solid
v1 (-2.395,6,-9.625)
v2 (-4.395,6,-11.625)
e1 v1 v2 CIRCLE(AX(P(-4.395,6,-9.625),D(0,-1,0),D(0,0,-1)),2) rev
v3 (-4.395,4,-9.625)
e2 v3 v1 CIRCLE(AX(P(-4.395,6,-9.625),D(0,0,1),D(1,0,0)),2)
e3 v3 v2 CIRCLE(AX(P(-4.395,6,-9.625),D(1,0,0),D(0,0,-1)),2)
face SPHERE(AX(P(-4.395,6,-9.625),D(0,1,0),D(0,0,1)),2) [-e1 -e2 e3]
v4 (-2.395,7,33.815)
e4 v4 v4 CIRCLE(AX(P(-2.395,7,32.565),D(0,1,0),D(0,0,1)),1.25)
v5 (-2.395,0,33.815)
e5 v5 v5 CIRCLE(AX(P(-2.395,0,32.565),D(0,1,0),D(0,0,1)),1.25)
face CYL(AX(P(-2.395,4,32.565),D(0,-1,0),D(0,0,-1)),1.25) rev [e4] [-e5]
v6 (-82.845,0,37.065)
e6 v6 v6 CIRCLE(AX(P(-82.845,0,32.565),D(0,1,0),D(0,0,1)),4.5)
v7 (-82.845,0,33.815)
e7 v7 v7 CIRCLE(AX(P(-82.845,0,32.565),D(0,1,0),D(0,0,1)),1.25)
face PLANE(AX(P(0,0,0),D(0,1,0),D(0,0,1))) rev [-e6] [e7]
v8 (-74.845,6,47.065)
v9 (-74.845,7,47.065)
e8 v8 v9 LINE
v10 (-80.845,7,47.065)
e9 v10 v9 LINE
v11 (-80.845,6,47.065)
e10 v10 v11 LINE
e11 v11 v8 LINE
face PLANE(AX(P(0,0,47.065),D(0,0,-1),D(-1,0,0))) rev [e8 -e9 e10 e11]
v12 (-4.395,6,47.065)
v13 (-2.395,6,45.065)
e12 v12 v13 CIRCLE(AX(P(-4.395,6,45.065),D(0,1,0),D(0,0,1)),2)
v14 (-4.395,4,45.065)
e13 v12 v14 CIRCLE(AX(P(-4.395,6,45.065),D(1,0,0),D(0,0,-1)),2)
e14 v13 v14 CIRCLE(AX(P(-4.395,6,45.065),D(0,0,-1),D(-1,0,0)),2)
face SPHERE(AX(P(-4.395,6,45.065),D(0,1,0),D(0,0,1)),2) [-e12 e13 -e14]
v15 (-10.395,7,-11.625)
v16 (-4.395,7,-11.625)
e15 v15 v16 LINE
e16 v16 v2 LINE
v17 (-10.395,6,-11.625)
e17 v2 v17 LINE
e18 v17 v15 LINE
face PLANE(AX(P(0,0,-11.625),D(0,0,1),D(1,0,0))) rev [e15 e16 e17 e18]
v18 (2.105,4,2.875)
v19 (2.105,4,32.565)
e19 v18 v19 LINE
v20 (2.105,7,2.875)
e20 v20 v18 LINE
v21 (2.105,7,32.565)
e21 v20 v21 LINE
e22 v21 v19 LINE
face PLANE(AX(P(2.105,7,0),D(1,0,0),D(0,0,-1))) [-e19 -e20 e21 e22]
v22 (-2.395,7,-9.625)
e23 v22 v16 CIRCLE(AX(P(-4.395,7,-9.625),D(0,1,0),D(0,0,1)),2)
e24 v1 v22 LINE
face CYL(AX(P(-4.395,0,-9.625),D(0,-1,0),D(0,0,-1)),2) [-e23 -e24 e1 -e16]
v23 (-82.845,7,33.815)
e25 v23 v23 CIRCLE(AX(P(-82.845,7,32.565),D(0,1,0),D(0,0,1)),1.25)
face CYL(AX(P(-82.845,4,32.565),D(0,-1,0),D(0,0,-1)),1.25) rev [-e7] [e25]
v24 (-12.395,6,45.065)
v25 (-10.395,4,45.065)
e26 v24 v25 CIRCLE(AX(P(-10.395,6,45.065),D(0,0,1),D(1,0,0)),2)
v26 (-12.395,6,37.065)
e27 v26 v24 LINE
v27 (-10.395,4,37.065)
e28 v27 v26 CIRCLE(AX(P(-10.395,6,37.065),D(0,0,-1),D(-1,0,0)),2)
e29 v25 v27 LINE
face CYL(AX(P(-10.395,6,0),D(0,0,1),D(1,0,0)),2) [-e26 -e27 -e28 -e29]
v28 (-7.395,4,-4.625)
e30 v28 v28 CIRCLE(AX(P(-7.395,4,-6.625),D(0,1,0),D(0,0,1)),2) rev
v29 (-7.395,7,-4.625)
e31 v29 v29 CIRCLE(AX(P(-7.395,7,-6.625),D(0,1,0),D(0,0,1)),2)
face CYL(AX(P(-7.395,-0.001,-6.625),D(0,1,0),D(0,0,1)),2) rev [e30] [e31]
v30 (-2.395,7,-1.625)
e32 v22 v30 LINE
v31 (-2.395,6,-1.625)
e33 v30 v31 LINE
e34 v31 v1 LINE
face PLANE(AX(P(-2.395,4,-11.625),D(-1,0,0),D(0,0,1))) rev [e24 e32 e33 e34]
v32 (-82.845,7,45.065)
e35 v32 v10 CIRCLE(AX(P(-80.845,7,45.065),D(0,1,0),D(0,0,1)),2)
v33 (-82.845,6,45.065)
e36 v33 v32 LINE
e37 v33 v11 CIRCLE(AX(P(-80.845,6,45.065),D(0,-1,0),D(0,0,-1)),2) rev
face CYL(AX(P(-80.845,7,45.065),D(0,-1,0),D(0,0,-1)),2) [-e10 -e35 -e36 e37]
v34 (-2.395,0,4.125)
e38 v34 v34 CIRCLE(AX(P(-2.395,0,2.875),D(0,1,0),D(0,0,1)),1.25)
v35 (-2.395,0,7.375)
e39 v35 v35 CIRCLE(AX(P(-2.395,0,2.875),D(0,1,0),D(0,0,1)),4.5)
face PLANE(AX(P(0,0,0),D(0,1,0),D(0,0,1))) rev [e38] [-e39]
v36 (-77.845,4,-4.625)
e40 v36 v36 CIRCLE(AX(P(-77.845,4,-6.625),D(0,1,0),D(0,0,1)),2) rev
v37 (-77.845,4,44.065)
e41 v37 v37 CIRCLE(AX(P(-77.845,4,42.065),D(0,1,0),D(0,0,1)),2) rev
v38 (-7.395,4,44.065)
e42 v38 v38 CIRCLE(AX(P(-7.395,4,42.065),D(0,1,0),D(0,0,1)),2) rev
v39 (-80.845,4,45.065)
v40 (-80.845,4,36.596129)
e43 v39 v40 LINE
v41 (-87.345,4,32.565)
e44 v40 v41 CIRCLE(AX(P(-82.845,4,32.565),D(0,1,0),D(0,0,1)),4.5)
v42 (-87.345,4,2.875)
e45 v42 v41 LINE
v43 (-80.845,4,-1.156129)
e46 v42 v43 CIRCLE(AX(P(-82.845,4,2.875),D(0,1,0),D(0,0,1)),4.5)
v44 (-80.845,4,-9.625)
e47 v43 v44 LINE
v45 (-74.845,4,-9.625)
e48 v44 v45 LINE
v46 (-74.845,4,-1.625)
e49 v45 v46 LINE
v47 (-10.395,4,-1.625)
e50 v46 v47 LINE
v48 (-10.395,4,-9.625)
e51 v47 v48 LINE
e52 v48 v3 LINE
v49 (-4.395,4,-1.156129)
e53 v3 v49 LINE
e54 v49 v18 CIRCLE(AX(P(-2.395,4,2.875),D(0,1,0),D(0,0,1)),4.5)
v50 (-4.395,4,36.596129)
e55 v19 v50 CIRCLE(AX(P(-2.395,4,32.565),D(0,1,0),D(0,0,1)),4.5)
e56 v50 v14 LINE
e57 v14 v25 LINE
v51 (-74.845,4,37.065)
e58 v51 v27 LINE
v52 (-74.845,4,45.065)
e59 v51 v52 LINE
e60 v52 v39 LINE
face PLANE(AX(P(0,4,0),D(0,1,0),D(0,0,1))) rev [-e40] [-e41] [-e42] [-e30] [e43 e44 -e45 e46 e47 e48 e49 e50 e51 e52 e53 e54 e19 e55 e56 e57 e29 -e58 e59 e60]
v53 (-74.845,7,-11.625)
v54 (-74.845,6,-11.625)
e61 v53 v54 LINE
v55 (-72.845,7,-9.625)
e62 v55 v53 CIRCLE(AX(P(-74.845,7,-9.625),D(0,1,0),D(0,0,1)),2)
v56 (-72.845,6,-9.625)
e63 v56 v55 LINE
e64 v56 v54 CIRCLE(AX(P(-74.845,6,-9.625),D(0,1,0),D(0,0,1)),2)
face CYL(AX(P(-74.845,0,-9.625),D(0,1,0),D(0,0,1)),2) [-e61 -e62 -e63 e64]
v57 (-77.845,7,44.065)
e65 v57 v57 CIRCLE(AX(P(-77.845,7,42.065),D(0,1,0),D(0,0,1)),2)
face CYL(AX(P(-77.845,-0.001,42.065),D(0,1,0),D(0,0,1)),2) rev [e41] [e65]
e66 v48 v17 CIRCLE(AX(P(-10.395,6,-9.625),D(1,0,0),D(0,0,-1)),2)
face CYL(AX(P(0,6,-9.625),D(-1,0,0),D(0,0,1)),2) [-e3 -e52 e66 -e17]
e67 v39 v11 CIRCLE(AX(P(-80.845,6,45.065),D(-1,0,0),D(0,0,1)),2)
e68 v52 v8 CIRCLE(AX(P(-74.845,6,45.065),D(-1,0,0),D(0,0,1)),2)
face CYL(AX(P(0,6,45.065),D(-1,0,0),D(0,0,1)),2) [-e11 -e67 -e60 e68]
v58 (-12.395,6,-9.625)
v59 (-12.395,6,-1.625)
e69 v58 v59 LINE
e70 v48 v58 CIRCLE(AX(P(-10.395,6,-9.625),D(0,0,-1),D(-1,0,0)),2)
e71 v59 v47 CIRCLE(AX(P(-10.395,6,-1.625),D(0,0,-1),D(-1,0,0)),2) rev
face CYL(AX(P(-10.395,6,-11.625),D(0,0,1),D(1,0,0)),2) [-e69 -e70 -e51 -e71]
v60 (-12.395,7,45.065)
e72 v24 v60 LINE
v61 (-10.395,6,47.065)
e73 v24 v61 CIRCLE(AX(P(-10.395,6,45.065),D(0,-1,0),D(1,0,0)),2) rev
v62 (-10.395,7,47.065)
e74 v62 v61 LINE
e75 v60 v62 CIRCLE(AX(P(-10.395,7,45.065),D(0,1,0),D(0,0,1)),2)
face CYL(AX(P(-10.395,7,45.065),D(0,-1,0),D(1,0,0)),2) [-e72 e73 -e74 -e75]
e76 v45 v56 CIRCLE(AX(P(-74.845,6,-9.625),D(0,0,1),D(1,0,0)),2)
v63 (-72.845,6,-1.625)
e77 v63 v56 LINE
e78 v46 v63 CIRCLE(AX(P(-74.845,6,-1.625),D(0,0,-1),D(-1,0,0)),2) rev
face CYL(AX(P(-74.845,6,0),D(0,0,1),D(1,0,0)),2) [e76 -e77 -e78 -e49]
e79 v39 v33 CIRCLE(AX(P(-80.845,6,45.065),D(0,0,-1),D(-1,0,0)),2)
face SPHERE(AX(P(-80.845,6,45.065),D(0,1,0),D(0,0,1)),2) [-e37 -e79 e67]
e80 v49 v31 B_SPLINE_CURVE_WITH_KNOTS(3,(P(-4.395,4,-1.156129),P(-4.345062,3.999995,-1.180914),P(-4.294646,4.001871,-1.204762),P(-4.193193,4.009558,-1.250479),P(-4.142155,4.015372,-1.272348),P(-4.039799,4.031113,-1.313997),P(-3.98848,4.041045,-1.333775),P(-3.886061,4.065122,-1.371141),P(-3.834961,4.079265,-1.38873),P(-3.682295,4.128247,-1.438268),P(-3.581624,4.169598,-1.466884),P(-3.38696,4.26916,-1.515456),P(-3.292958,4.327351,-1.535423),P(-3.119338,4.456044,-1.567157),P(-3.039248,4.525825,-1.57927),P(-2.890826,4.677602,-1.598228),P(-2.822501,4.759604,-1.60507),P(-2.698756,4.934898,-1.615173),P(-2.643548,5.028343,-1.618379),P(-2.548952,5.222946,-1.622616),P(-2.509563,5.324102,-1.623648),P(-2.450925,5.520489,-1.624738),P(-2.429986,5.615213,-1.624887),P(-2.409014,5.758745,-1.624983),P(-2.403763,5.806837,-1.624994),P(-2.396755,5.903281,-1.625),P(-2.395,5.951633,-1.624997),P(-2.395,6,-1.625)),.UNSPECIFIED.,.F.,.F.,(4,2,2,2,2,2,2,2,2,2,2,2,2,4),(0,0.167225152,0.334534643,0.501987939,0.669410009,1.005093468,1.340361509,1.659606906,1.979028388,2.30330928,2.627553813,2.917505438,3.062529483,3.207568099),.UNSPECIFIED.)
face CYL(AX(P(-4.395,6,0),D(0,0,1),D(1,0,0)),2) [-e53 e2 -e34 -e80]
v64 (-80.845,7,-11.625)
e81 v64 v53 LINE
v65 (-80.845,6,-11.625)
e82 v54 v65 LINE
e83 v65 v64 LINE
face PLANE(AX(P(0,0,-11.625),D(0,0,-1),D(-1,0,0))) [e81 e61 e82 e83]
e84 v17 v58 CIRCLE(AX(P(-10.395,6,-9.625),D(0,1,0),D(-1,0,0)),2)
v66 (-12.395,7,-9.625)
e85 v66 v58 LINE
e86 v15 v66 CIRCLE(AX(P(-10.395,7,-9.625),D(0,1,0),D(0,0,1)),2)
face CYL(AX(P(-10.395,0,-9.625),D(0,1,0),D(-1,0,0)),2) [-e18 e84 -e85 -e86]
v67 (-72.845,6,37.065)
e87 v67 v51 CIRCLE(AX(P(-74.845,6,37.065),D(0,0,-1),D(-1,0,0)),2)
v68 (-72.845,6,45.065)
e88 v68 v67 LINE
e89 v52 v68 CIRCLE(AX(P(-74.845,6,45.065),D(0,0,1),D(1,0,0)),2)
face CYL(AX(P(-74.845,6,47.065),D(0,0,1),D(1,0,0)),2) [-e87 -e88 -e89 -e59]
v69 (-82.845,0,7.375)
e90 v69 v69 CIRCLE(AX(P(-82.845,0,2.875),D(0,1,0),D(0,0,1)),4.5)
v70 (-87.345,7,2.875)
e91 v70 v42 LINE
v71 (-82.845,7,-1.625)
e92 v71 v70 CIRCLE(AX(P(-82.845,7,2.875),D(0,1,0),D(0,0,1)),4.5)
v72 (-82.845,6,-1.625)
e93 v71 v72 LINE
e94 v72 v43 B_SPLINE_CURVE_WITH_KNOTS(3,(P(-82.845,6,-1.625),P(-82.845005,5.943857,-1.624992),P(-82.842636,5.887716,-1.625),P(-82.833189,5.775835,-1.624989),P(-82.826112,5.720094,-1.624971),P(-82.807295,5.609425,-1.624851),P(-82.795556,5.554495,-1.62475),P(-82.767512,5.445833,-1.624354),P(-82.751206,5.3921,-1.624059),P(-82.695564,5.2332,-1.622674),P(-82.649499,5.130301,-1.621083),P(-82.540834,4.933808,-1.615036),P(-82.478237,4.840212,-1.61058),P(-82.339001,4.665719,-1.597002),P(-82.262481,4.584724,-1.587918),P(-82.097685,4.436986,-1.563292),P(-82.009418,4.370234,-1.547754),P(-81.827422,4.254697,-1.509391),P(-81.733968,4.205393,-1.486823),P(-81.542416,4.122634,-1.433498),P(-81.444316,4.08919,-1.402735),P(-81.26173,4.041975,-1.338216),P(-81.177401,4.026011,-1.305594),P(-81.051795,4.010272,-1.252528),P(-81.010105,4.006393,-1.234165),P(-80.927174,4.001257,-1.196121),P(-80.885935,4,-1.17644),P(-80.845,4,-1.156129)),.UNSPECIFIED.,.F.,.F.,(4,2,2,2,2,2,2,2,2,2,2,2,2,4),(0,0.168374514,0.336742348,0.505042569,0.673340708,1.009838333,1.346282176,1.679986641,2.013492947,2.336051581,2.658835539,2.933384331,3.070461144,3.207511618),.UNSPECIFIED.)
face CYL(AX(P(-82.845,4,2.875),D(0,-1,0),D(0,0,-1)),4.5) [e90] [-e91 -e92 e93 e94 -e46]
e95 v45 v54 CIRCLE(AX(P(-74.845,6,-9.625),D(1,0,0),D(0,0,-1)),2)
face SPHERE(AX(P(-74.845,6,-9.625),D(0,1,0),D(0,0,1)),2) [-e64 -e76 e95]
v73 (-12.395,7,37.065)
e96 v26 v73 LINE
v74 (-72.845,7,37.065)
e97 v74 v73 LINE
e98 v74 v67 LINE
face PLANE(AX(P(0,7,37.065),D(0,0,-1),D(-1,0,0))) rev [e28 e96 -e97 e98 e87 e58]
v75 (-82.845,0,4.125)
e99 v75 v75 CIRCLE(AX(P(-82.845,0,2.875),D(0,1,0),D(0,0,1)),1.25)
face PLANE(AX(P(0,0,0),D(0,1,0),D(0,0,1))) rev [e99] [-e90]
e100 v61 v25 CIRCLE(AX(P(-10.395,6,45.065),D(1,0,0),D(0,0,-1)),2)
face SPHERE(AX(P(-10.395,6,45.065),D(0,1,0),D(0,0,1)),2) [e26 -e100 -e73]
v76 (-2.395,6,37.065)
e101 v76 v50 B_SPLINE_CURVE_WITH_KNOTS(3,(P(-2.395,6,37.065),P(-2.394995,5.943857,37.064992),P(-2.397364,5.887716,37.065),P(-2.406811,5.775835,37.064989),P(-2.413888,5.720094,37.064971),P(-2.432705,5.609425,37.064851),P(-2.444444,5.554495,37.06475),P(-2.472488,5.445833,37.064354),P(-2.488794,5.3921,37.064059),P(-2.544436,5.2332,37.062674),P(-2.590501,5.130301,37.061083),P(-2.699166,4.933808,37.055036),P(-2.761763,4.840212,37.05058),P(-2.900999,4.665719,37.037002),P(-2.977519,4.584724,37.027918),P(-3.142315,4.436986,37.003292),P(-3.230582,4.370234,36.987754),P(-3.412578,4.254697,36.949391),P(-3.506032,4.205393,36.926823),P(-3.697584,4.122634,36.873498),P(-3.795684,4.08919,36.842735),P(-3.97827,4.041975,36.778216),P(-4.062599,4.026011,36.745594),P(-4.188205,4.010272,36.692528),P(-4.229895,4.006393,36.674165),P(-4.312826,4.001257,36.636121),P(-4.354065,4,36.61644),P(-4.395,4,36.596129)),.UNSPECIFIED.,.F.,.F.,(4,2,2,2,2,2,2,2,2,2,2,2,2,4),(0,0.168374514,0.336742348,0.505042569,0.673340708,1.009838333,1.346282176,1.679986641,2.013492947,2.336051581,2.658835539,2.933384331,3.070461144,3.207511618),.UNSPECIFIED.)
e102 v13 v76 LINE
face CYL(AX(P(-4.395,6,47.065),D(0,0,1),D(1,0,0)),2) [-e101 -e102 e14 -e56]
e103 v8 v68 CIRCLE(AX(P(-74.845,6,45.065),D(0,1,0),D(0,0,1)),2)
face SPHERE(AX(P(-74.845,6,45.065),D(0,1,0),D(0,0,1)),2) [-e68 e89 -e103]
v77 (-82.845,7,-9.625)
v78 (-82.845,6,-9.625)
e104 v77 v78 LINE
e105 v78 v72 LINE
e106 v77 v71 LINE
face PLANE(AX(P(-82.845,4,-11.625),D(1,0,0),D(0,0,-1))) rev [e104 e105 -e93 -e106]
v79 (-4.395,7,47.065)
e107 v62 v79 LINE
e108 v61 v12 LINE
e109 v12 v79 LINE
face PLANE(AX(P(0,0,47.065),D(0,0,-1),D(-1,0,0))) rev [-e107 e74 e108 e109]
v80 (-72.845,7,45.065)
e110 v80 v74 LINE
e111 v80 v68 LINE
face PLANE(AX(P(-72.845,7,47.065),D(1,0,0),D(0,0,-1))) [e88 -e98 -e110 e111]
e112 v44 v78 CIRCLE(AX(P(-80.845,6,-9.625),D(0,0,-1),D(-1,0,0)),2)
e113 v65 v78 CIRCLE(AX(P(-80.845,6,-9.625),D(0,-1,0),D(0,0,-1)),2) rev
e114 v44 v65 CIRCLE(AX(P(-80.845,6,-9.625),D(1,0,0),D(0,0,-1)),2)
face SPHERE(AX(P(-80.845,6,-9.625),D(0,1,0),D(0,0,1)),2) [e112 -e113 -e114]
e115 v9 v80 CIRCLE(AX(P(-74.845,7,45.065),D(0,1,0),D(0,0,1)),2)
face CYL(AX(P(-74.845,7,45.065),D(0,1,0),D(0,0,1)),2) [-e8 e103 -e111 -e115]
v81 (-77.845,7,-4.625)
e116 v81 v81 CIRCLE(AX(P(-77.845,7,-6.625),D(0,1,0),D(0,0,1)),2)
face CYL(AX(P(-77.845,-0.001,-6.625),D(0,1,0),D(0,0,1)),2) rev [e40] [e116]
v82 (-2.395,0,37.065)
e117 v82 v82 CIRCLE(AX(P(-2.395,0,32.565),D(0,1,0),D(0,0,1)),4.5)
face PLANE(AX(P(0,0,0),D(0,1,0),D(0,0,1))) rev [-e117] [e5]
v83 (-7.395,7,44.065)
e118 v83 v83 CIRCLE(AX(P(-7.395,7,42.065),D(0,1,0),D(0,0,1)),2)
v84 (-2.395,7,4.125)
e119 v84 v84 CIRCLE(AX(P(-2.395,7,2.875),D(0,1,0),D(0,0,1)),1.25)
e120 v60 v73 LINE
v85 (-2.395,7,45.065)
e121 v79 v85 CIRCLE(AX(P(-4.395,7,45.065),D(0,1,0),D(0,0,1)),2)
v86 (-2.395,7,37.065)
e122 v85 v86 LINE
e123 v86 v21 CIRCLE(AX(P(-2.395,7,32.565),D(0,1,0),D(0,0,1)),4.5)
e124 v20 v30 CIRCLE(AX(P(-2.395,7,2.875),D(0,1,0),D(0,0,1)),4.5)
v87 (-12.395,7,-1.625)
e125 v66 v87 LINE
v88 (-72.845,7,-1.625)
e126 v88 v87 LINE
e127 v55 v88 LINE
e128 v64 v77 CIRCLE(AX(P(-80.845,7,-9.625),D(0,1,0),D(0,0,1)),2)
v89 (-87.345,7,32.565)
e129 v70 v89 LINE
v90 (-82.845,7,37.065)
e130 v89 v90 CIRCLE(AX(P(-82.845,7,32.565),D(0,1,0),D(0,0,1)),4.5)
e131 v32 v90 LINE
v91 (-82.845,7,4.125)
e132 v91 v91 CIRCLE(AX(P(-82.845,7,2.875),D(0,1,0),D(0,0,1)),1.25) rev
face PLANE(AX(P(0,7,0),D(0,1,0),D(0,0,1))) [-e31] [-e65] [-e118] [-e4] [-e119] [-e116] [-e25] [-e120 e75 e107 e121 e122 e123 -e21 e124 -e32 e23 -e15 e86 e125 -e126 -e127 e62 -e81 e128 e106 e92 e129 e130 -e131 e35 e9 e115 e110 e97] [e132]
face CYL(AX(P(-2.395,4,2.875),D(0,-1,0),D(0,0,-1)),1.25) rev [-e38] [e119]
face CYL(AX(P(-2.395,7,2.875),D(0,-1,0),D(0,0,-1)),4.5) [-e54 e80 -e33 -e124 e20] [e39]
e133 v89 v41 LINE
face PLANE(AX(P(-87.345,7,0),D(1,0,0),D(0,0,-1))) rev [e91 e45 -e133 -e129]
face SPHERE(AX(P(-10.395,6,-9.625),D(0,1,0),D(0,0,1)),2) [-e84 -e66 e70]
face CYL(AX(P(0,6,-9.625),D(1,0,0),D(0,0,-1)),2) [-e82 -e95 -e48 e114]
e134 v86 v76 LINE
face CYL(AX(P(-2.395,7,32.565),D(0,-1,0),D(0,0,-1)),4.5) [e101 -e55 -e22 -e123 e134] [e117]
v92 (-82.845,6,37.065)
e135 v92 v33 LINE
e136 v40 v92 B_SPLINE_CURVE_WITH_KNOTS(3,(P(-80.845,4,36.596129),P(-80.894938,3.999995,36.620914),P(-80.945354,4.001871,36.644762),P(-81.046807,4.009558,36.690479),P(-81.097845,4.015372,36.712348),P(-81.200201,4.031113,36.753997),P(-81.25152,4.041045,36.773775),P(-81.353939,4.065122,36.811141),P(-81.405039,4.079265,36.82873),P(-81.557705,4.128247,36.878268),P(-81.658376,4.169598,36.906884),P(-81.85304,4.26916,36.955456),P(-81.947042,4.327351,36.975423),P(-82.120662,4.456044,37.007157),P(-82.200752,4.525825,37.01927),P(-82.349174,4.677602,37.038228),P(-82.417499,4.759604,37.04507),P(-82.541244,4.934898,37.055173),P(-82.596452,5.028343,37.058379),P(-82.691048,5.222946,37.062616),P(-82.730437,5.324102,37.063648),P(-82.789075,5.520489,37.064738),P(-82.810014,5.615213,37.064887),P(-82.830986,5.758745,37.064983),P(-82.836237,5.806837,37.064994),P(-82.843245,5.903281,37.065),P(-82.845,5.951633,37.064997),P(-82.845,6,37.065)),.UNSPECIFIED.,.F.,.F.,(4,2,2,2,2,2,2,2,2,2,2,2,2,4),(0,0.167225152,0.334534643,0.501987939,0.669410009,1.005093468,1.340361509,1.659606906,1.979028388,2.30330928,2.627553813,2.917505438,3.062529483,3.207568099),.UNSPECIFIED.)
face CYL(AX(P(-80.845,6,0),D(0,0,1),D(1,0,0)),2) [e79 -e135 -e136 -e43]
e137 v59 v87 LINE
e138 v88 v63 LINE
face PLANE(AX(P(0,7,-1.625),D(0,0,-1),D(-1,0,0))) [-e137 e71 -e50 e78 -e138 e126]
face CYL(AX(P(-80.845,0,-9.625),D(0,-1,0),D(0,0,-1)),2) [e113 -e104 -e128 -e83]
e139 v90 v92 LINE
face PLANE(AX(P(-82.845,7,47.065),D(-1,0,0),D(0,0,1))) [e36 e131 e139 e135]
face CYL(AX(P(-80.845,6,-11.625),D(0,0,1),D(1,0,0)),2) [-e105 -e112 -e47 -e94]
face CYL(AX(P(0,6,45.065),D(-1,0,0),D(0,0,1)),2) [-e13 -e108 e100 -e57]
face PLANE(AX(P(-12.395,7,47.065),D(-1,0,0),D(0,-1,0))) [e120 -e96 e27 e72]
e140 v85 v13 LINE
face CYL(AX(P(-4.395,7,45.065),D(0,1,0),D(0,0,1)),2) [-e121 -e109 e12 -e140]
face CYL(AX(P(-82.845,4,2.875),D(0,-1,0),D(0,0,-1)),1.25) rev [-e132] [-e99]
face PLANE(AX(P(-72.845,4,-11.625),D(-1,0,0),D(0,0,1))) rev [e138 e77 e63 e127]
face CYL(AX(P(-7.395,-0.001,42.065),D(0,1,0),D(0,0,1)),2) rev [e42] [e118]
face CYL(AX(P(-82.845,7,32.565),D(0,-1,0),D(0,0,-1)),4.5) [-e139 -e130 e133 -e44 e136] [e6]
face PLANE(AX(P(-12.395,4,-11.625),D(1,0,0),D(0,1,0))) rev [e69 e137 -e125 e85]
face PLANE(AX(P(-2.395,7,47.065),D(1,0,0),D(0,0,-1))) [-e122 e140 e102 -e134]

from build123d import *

# Parameters (mm, degrees)
SKETCH1_R           = 1.25
BOSS_EXTRUDE1_DEPTH = 4
BOSS_EXTRUDE2_DEPTH = 3
SKETCH1_3_R         = 1.25
CUT_EXTRUDE1_DEPTH  = 7
SKETCH3_W           = 10
SKETCH3_H           = 3
BOSS_EXTRUDE3_DEPTH = 10
BOSS_EXTRUDE4_START = -38.69
SKETCH3_2_W         = 10
SKETCH3_2_H         = 3
BOSS_EXTRUDE4_DEPTH = 10
FILLET1_R           = 2
FILLET2_R           = 2
CUT_EXTRUDE2_REACH  = 101.465
SKETCH4_R           = 2


with BuildPart() as part:
    # Sketch1 → Boss-Extrude1 (new body)
    # profile 1 of 8: a face of its own
    with BuildSketch(Plane(origin=(0, 0, 0), x_dir=(1, 0, 0), z_dir=(0, 1, 0))):
        with BuildLine():
            ThreePointArc((-78.345, -2.875), (-78.612488616, -1.346652073), (-79.383154394, 0))
            Line((-79.383154394, 0), (-85.4, 0))
            Line((-85.4, 0), (-85.4, -6.579318426))
            ThreePointArc((-85.4, -6.579318426), (-80.753051148, -6.859187496), (-78.345, -2.875))
        make_face()
        with Locations(Location((-82.845, -2.875, 0), (0, 0, 270))):
            Circle(SKETCH1_R, mode=Mode.SUBTRACT)
    # profile 2 of 8: a face of its own
    with BuildSketch(Plane(origin=(0, 0, 0), x_dir=(1, 0, 0), z_dir=(0, 1, 0))):
        with BuildLine():
            Line((-85.4, 0), (-79.383154394, 0))
            ThreePointArc((-79.383154394, 0), (-86.165760451, 0.161865164), (-85.4, -6.579318426))
            Line((-85.4, -6.579318426), (-85.4, 0))
        make_face()
    # profile 3 of 8: a face of its own
    with BuildSketch(Plane(origin=(0, 0, 0), x_dir=(1, 0, 0), z_dir=(0, 1, 0))):
        with BuildLine():
            Line((-85.4, -35.22), (-85.4, -28.860681574))
            ThreePointArc((-85.4, -28.860681574), (-86.070046249, -35.703323867), (-79.211685398, -35.22))
            Line((-79.211685398, -35.22), (-85.4, -35.22))
        make_face()
    # profile 4 of 8: a face of its own
    with BuildSketch(Plane(origin=(0, 0, 0), x_dir=(1, 0, 0), z_dir=(0, 1, 0))):
        with BuildLine():
            ThreePointArc((-78.345, -32.565), (-80.753051148, -28.580812504), (-85.4, -28.860681574))
            Line((-85.4, -28.860681574), (-85.4, -35.22))
            Line((-85.4, -35.22), (-79.211685398, -35.22))
            ThreePointArc((-79.211685398, -35.22), (-78.567154999, -33.961439094), (-78.345, -32.565))
        make_face()
        with Locations(Location((-82.845, -32.565, 0), (0, 0, 270))):
            Circle(SKETCH1_R, mode=Mode.SUBTRACT)
    # profile 5 of 8: a face of its own
    with BuildSketch(Plane(origin=(0, 0, 0), x_dir=(1, 0, 0), z_dir=(0, 1, 0))):
        with BuildLine():
            Line((0, -35.22), (0, -28.755278882))
            ThreePointArc((0, -28.755278882), (-5.68612603, -29.496044241), (-6.028314602, -35.22))
            Line((-6.028314602, -35.22), (0, -35.22))
        make_face()
        with Locations(Location((-2.395, -32.565, 0), (0, 0, 270))):
            Circle(SKETCH1_R, mode=Mode.SUBTRACT)
    # profile 6 of 8: a face of its own
    with BuildSketch(Plane(origin=(0, 0, 0), x_dir=(1, 0, 0), z_dir=(0, 1, 0))):
        with BuildLine():
            ThreePointArc((2.105, -32.565), (1.543749802, -30.388707281), (0, -28.755278882))
            Line((0, -28.755278882), (0, -35.22))
            Line((0, -35.22), (-6.028314602, -35.22))
            ThreePointArc((-6.028314602, -35.22), (-0.998560906, -36.842845001), (2.105, -32.565))
        make_face()
    # profile 7 of 8: a face of its own
    with BuildSketch(Plane(origin=(0, 0, 0), x_dir=(1, 0, 0), z_dir=(0, 1, 0))):
        with BuildLine():
            Line((0, -6.684721118), (0, 0))
            Line((0, 0), (-5.856845606, 0))
            ThreePointArc((-5.856845606, 0), (-5.779658623, -5.840482424), (0, -6.684721118))
        make_face()
        with Locations(Location((-2.395, -2.875, 0), (0, 0, 270))):
            Circle(SKETCH1_R, mode=Mode.SUBTRACT)
    # profile 8 of 8: a face of its own
    with BuildSketch(Plane(origin=(0, 0, 0), x_dir=(1, 0, 0), z_dir=(0, 1, 0))):
        with BuildLine():
            Line((-5.856845606, 0), (0, 0))
            Line((0, 0), (0, -6.684721118))
            ThreePointArc((0, -6.684721118), (1.543749802, -5.051292719), (2.105, -2.875))
            ThreePointArc((2.105, -2.875), (-0.866652073, 1.357511384), (-5.856845606, 0))
        make_face()
    extrude(amount=BOSS_EXTRUDE1_DEPTH)

    # Sketch2 → Boss-Extrude2 (add)
    with BuildSketch(Plane(origin=(0, 4, 0), x_dir=(1, 0, 0), z_dir=(0, 1, 0))):
        with BuildLine():
            Line((-2.395, 1.625), (-82.845, 1.625))
            ThreePointArc((-82.845, 1.625), (-79.663019485, 0.306980515), (-78.345, -2.875))
            Line((-78.345, -2.875), (-6.895, -2.875))
            ThreePointArc((-6.895, -2.875), (-5.576980515, 0.306980515), (-2.395, 1.625))
        make_face()
        with BuildLine():
            ThreePointArc((-78.345, -2.875), (-79.663019485, 0.306980515), (-82.845, 1.625))
            Line((-82.845, 1.625), (-82.845, -1.625))
            ThreePointArc((-82.845, -1.625), (-81.961116524, -1.991116524), (-81.595, -2.875))
            Line((-81.595, -2.875), (-78.345, -2.875))
        make_face()
        with BuildLine():
            Line((-82.845, -1.625), (-82.845, 1.625))
            ThreePointArc((-82.845, 1.625), (-86.026980515, 0.306980515), (-87.345, -2.875))
            Line((-87.345, -2.875), (-84.095, -2.875))
            ThreePointArc((-84.095, -2.875), (-83.728883476, -1.991116524), (-82.845, -1.625))
        make_face()
        with BuildLine():
            ThreePointArc((-82.845, -7.375), (-79.663019485, -6.056980515), (-78.345, -2.875))
            Line((-78.345, -2.875), (-81.595, -2.875))
            ThreePointArc((-81.595, -2.875), (-81.961116524, -3.758883476), (-82.845, -4.125))
            Line((-82.845, -4.125), (-82.845, -7.375))
        make_face()
        with BuildLine():
            Line((-84.095, -2.875), (-87.345, -2.875))
            ThreePointArc((-87.345, -2.875), (-86.026980515, -6.056980515), (-82.845, -7.375))
            Line((-82.845, -7.375), (-82.845, -4.125))
            ThreePointArc((-82.845, -4.125), (-83.728883476, -3.758883476), (-84.095, -2.875))
        make_face()
        with BuildLine():
            ThreePointArc((-78.345, -2.875), (-79.663019485, 0.306980515), (-82.845, 1.625))
            Line((-82.845, 1.625), (-82.845, -1.625))
            ThreePointArc((-82.845, -1.625), (-81.961116524, -1.991116524), (-81.595, -2.875))
            Line((-81.595, -2.875), (-78.345, -2.875))
        make_face()
        with BuildLine():
            Line((-82.845, -1.625), (-82.845, 1.625))
            ThreePointArc((-82.845, 1.625), (-86.026980515, 0.306980515), (-87.345, -2.875))
            Line((-87.345, -2.875), (-84.095, -2.875))
            ThreePointArc((-84.095, -2.875), (-83.728883476, -1.991116524), (-82.845, -1.625))
        make_face()
        with BuildLine():
            ThreePointArc((-82.845, -7.375), (-79.663019485, -6.056980515), (-78.345, -2.875))
            Line((-78.345, -2.875), (-81.595, -2.875))
            ThreePointArc((-81.595, -2.875), (-81.961116524, -3.758883476), (-82.845, -4.125))
            Line((-82.845, -4.125), (-82.845, -7.375))
        make_face()
        with BuildLine():
            Line((-84.095, -2.875), (-87.345, -2.875))
            ThreePointArc((-87.345, -2.875), (-86.026980515, -6.056980515), (-82.845, -7.375))
            Line((-82.845, -7.375), (-82.845, -4.125))
            ThreePointArc((-82.845, -4.125), (-83.728883476, -3.758883476), (-84.095, -2.875))
        make_face()
        with BuildLine():
            ThreePointArc((-78.345, -2.875), (-79.663019485, 0.306980515), (-82.845, 1.625))
            Line((-82.845, 1.625), (-82.845, -1.625))
            ThreePointArc((-82.845, -1.625), (-81.961116524, -1.991116524), (-81.595, -2.875))
            Line((-81.595, -2.875), (-78.345, -2.875))
        make_face()
        with BuildLine():
            Line((-82.845, -1.625), (-82.845, 1.625))
            ThreePointArc((-82.845, 1.625), (-86.026980515, 0.306980515), (-87.345, -2.875))
            Line((-87.345, -2.875), (-84.095, -2.875))
            ThreePointArc((-84.095, -2.875), (-83.728883476, -1.991116524), (-82.845, -1.625))
        make_face()
        with BuildLine():
            ThreePointArc((-82.845, -7.375), (-79.663019485, -6.056980515), (-78.345, -2.875))
            Line((-78.345, -2.875), (-81.595, -2.875))
            ThreePointArc((-81.595, -2.875), (-81.961116524, -3.758883476), (-82.845, -4.125))
            Line((-82.845, -4.125), (-82.845, -7.375))
        make_face()
        with BuildLine():
            Line((-84.095, -2.875), (-87.345, -2.875))
            ThreePointArc((-87.345, -2.875), (-86.026980515, -6.056980515), (-82.845, -7.375))
            Line((-82.845, -7.375), (-82.845, -4.125))
            ThreePointArc((-82.845, -4.125), (-83.728883476, -3.758883476), (-84.095, -2.875))
        make_face()
        with BuildLine():
            ThreePointArc((-78.345, -2.875), (-79.663019485, 0.306980515), (-82.845, 1.625))
            Line((-82.845, 1.625), (-82.845, -1.625))
            ThreePointArc((-82.845, -1.625), (-81.961116524, -1.991116524), (-81.595, -2.875))
            Line((-81.595, -2.875), (-78.345, -2.875))
        make_face()
        with BuildLine():
            Line((-82.845, -1.625), (-82.845, 1.625))
            ThreePointArc((-82.845, 1.625), (-86.026980515, 0.306980515), (-87.345, -2.875))
            Line((-87.345, -2.875), (-84.095, -2.875))
            ThreePointArc((-84.095, -2.875), (-83.728883476, -1.991116524), (-82.845, -1.625))
        make_face()
        with BuildLine():
            ThreePointArc((-82.845, -7.375), (-79.663019485, -6.056980515), (-78.345, -2.875))
            Line((-78.345, -2.875), (-81.595, -2.875))
            ThreePointArc((-81.595, -2.875), (-81.961116524, -3.758883476), (-82.845, -4.125))
            Line((-82.845, -4.125), (-82.845, -7.375))
        make_face()
        with BuildLine():
            Line((-84.095, -2.875), (-87.345, -2.875))
            ThreePointArc((-87.345, -2.875), (-86.026980515, -6.056980515), (-82.845, -7.375))
            Line((-82.845, -7.375), (-82.845, -4.125))
            ThreePointArc((-82.845, -4.125), (-83.728883476, -3.758883476), (-84.095, -2.875))
        make_face()
        with BuildLine():
            ThreePointArc((-82.845, -7.375), (-86.026980515, -6.056980515), (-87.345, -2.875))
            Line((-87.345, -2.875), (-87.345, -32.565))
            ThreePointArc((-87.345, -32.565), (-86.026980515, -29.383019485), (-82.845, -28.065))
            Line((-82.845, -28.065), (-82.845, -7.375))
        make_face()
        with BuildLine():
            Line((-6.895, -2.875), (-78.345, -2.875))
            ThreePointArc((-78.345, -2.875), (-79.663019485, -6.056980515), (-82.845, -7.375))
            Line((-82.845, -7.375), (-82.845, -28.065))
            ThreePointArc((-82.845, -28.065), (-79.663019485, -29.383019485), (-78.345, -32.565))
            Line((-78.345, -32.565), (-6.895, -32.565))
            ThreePointArc((-6.895, -32.565), (-5.576980515, -29.383019485), (-2.395, -28.065))
            Line((-2.395, -28.065), (-2.395, -7.375))
            ThreePointArc((-2.395, -7.375), (-5.576980515, -6.056980515), (-6.895, -2.875))
        make_face()
        with BuildLine():
            ThreePointArc((-82.845, -28.065), (-86.026980515, -29.383019485), (-87.345, -32.565))
            Line((-87.345, -32.565), (-82.845, -32.565))
            Line((-82.845, -32.565), (-82.845, -28.065))
        make_face()
        with BuildLine():
            Line((-82.845, -32.565), (-87.345, -32.565))
            ThreePointArc((-87.345, -32.565), (-86.026980515, -35.746980515), (-82.845, -37.065))
            Line((-82.845, -37.065), (-82.845, -32.565))
        make_face()
        with BuildLine():
            ThreePointArc((-78.345, -32.565), (-79.663019485, -29.383019485), (-82.845, -28.065))
            Line((-82.845, -28.065), (-82.845, -32.565))
            Line((-82.845, -32.565), (-78.345, -32.565))
        make_face()
        with BuildLine():
            Line((-78.345, -32.565), (-82.845, -32.565))
            Line((-82.845, -32.565), (-82.845, -37.065))
            ThreePointArc((-82.845, -37.065), (-79.663019485, -35.746980515), (-78.345, -32.565))
        make_face()
        with BuildLine():
            ThreePointArc((-82.845, -28.065), (-86.026980515, -29.383019485), (-87.345, -32.565))
            Line((-87.345, -32.565), (-82.845, -32.565))
            Line((-82.845, -32.565), (-82.845, -28.065))
        make_face()
        with BuildLine():
            Line((-82.845, -32.565), (-87.345, -32.565))
            ThreePointArc((-87.345, -32.565), (-86.026980515, -35.746980515), (-82.845, -37.065))
            Line((-82.845, -37.065), (-82.845, -32.565))
        make_face()
        with BuildLine():
            ThreePointArc((-78.345, -32.565), (-79.663019485, -29.383019485), (-82.845, -28.065))
            Line((-82.845, -28.065), (-82.845, -32.565))
            Line((-82.845, -32.565), (-78.345, -32.565))
        make_face()
        with BuildLine():
            Line((-78.345, -32.565), (-82.845, -32.565))
            Line((-82.845, -32.565), (-82.845, -37.065))
            ThreePointArc((-82.845, -37.065), (-79.663019485, -35.746980515), (-78.345, -32.565))
        make_face()
        with BuildLine():
            ThreePointArc((-82.845, -28.065), (-86.026980515, -29.383019485), (-87.345, -32.565))
            Line((-87.345, -32.565), (-82.845, -32.565))
            Line((-82.845, -32.565), (-82.845, -28.065))
        make_face()
        with BuildLine():
            Line((-82.845, -32.565), (-87.345, -32.565))
            ThreePointArc((-87.345, -32.565), (-86.026980515, -35.746980515), (-82.845, -37.065))
            Line((-82.845, -37.065), (-82.845, -32.565))
        make_face()
        with BuildLine():
            ThreePointArc((-78.345, -32.565), (-79.663019485, -29.383019485), (-82.845, -28.065))
            Line((-82.845, -28.065), (-82.845, -32.565))
            Line((-82.845, -32.565), (-78.345, -32.565))
        make_face()
        with BuildLine():
            Line((-78.345, -32.565), (-82.845, -32.565))
            Line((-82.845, -32.565), (-82.845, -37.065))
            ThreePointArc((-82.845, -37.065), (-79.663019485, -35.746980515), (-78.345, -32.565))
        make_face()
        with BuildLine():
            ThreePointArc((-82.845, -28.065), (-86.026980515, -29.383019485), (-87.345, -32.565))
            Line((-87.345, -32.565), (-82.845, -32.565))
            Line((-82.845, -32.565), (-82.845, -28.065))
        make_face()
        with BuildLine():
            Line((-82.845, -32.565), (-87.345, -32.565))
            ThreePointArc((-87.345, -32.565), (-86.026980515, -35.746980515), (-82.845, -37.065))
            Line((-82.845, -37.065), (-82.845, -32.565))
        make_face()
        with BuildLine():
            ThreePointArc((-78.345, -32.565), (-79.663019485, -29.383019485), (-82.845, -28.065))
            Line((-82.845, -28.065), (-82.845, -32.565))
            Line((-82.845, -32.565), (-78.345, -32.565))
        make_face()
        with BuildLine():
            Line((-78.345, -32.565), (-82.845, -32.565))
            Line((-82.845, -32.565), (-82.845, -37.065))
            ThreePointArc((-82.845, -37.065), (-79.663019485, -35.746980515), (-78.345, -32.565))
        make_face()
        with BuildLine():
            ThreePointArc((-78.345, -32.565), (-79.663019485, -35.746980515), (-82.845, -37.065))
            Line((-82.845, -37.065), (-2.395, -37.065))
            ThreePointArc((-2.395, -37.065), (-5.576980515, -35.746980515), (-6.895, -32.565))
            Line((-6.895, -32.565), (-78.345, -32.565))
        make_face()
        with BuildLine():
            ThreePointArc((-2.395, -37.065), (0.786980515, -35.746980515), (2.105, -32.565))
            Line((2.105, -32.565), (-2.395, -32.565))
            Line((-2.395, -32.565), (-2.395, -37.065))
        make_face()
        with BuildLine():
            Line((-2.395, -32.565), (2.105, -32.565))
            ThreePointArc((2.105, -32.565), (0.786980515, -29.383019485), (-2.395, -28.065))
            Line((-2.395, -28.065), (-2.395, -32.565))
        make_face()
        with BuildLine():
            Line((-2.395, -32.565), (-2.395, -28.065))
            ThreePointArc((-2.395, -28.065), (-5.576980515, -29.383019485), (-6.895, -32.565))
            Line((-6.895, -32.565), (-2.395, -32.565))
        make_face()
        with BuildLine():
            Line((-2.395, -37.065), (-2.395, -32.565))
            Line((-2.395, -32.565), (-6.895, -32.565))
            ThreePointArc((-6.895, -32.565), (-5.576980515, -35.746980515), (-2.395, -37.065))
        make_face()
        with BuildLine():
            ThreePointArc((-2.395, -37.065), (0.786980515, -35.746980515), (2.105, -32.565))
            Line((2.105, -32.565), (-2.395, -32.565))
            Line((-2.395, -32.565), (-2.395, -37.065))
        make_face()
        with BuildLine():
            Line((-2.395, -32.565), (2.105, -32.565))
            ThreePointArc((2.105, -32.565), (0.786980515, -29.383019485), (-2.395, -28.065))
            Line((-2.395, -28.065), (-2.395, -32.565))
        make_face()
        with BuildLine():
            Line((-2.395, -32.565), (-2.395, -28.065))
            ThreePointArc((-2.395, -28.065), (-5.576980515, -29.383019485), (-6.895, -32.565))
            Line((-6.895, -32.565), (-2.395, -32.565))
        make_face()
        with BuildLine():
            Line((-2.395, -37.065), (-2.395, -32.565))
            Line((-2.395, -32.565), (-6.895, -32.565))
            ThreePointArc((-6.895, -32.565), (-5.576980515, -35.746980515), (-2.395, -37.065))
        make_face()
        with BuildLine():
            ThreePointArc((-2.395, -37.065), (0.786980515, -35.746980515), (2.105, -32.565))
            Line((2.105, -32.565), (-2.395, -32.565))
            Line((-2.395, -32.565), (-2.395, -37.065))
        make_face()
        with BuildLine():
            Line((-2.395, -32.565), (2.105, -32.565))
            ThreePointArc((2.105, -32.565), (0.786980515, -29.383019485), (-2.395, -28.065))
            Line((-2.395, -28.065), (-2.395, -32.565))
        make_face()
        with BuildLine():
            Line((-2.395, -32.565), (-2.395, -28.065))
            ThreePointArc((-2.395, -28.065), (-5.576980515, -29.383019485), (-6.895, -32.565))
            Line((-6.895, -32.565), (-2.395, -32.565))
        make_face()
        with BuildLine():
            Line((-2.395, -37.065), (-2.395, -32.565))
            Line((-2.395, -32.565), (-6.895, -32.565))
            ThreePointArc((-6.895, -32.565), (-5.576980515, -35.746980515), (-2.395, -37.065))
        make_face()
        with BuildLine():
            ThreePointArc((-2.395, -37.065), (0.786980515, -35.746980515), (2.105, -32.565))
            Line((2.105, -32.565), (-2.395, -32.565))
            Line((-2.395, -32.565), (-2.395, -37.065))
        make_face()
        with BuildLine():
            Line((-2.395, -32.565), (2.105, -32.565))
            ThreePointArc((2.105, -32.565), (0.786980515, -29.383019485), (-2.395, -28.065))
            Line((-2.395, -28.065), (-2.395, -32.565))
        make_face()
        with BuildLine():
            Line((-2.395, -32.565), (-2.395, -28.065))
            ThreePointArc((-2.395, -28.065), (-5.576980515, -29.383019485), (-6.895, -32.565))
            Line((-6.895, -32.565), (-2.395, -32.565))
        make_face()
        with BuildLine():
            Line((-2.395, -37.065), (-2.395, -32.565))
            Line((-2.395, -32.565), (-6.895, -32.565))
            ThreePointArc((-6.895, -32.565), (-5.576980515, -35.746980515), (-2.395, -37.065))
        make_face()
        with BuildLine():
            Line((2.105, -32.565), (2.105, -2.875))
            ThreePointArc((2.105, -2.875), (0.786980515, -6.056980515), (-2.395, -7.375))
            Line((-2.395, -7.375), (-2.395, -28.065))
            ThreePointArc((-2.395, -28.065), (0.786980515, -29.383019485), (2.105, -32.565))
        make_face()
        with BuildLine():
            ThreePointArc((2.105, -2.875), (0.786980515, 0.306980515), (-2.395, 1.625))
            Line((-2.395, 1.625), (-2.395, -2.875))
            Line((-2.395, -2.875), (2.105, -2.875))
        make_face()
        with BuildLine():
            Line((-2.395, -2.875), (-2.395, 1.625))
            ThreePointArc((-2.395, 1.625), (-5.576980515, 0.306980515), (-6.895, -2.875))
            Line((-6.895, -2.875), (-2.395, -2.875))
        make_face()
        with BuildLine():
            Line((2.105, -2.875), (-2.395, -2.875))
            Line((-2.395, -2.875), (-2.395, -7.375))
            ThreePointArc((-2.395, -7.375), (0.786980515, -6.056980515), (2.105, -2.875))
        make_face()
        with BuildLine():
            Line((-2.395, -7.375), (-2.395, -2.875))
            Line((-2.395, -2.875), (-6.895, -2.875))
            ThreePointArc((-6.895, -2.875), (-5.576980515, -6.056980515), (-2.395, -7.375))
        make_face()
        with BuildLine():
            ThreePointArc((2.105, -2.875), (0.786980515, 0.306980515), (-2.395, 1.625))
            Line((-2.395, 1.625), (-2.395, -2.875))
            Line((-2.395, -2.875), (2.105, -2.875))
        make_face()
        with BuildLine():
            Line((-2.395, -2.875), (-2.395, 1.625))
            ThreePointArc((-2.395, 1.625), (-5.576980515, 0.306980515), (-6.895, -2.875))
            Line((-6.895, -2.875), (-2.395, -2.875))
        make_face()
        with BuildLine():
            Line((2.105, -2.875), (-2.395, -2.875))
            Line((-2.395, -2.875), (-2.395, -7.375))
            ThreePointArc((-2.395, -7.375), (0.786980515, -6.056980515), (2.105, -2.875))
        make_face()
        with BuildLine():
            Line((-2.395, -7.375), (-2.395, -2.875))
            Line((-2.395, -2.875), (-6.895, -2.875))
            ThreePointArc((-6.895, -2.875), (-5.576980515, -6.056980515), (-2.395, -7.375))
        make_face()
        with BuildLine():
            ThreePointArc((2.105, -2.875), (0.786980515, 0.306980515), (-2.395, 1.625))
            Line((-2.395, 1.625), (-2.395, -2.875))
            Line((-2.395, -2.875), (2.105, -2.875))
        make_face()
        with BuildLine():
            Line((-2.395, -2.875), (-2.395, 1.625))
            ThreePointArc((-2.395, 1.625), (-5.576980515, 0.306980515), (-6.895, -2.875))
            Line((-6.895, -2.875), (-2.395, -2.875))
        make_face()
        with BuildLine():
            Line((2.105, -2.875), (-2.395, -2.875))
            Line((-2.395, -2.875), (-2.395, -7.375))
            ThreePointArc((-2.395, -7.375), (0.786980515, -6.056980515), (2.105, -2.875))
        make_face()
        with BuildLine():
            Line((-2.395, -7.375), (-2.395, -2.875))
            Line((-2.395, -2.875), (-6.895, -2.875))
            ThreePointArc((-6.895, -2.875), (-5.576980515, -6.056980515), (-2.395, -7.375))
        make_face()
        with BuildLine():
            ThreePointArc((2.105, -2.875), (0.786980515, 0.306980515), (-2.395, 1.625))
            Line((-2.395, 1.625), (-2.395, -2.875))
            Line((-2.395, -2.875), (2.105, -2.875))
        make_face()
        with BuildLine():
            Line((-2.395, -2.875), (-2.395, 1.625))
            ThreePointArc((-2.395, 1.625), (-5.576980515, 0.306980515), (-6.895, -2.875))
            Line((-6.895, -2.875), (-2.395, -2.875))
        make_face()
        with BuildLine():
            Line((2.105, -2.875), (-2.395, -2.875))
            Line((-2.395, -2.875), (-2.395, -7.375))
            ThreePointArc((-2.395, -7.375), (0.786980515, -6.056980515), (2.105, -2.875))
        make_face()
        with BuildLine():
            Line((-2.395, -7.375), (-2.395, -2.875))
            Line((-2.395, -2.875), (-6.895, -2.875))
            ThreePointArc((-6.895, -2.875), (-5.576980515, -6.056980515), (-2.395, -7.375))
        make_face()
    extrude(amount=BOSS_EXTRUDE2_DEPTH)

    # Sketch1<3> → Cut-Extrude1 (cut)
    with BuildSketch(Plane(origin=(0, 0, 0), x_dir=(1, 0, 0), z_dir=(0, 1, 0))):
        with Locations(Location((-82.845, -2.875, 0), (0, 0, 270))):
            Circle(SKETCH1_3_R)
        with Locations(Location((-2.395, -2.875, 0), (0, 0, 270))):
            Circle(SKETCH1_3_R)
        with Locations(Location((-2.395, -32.565, 0), (0, 0, 270))):
            Circle(SKETCH1_3_R)
        with Locations(Location((-82.845, -32.565, 0), (0, 0, 270))):
            Circle(SKETCH1_3_R)
    extrude(amount=CUT_EXTRUDE1_DEPTH, mode=Mode.SUBTRACT)

    # Sketch3 → Boss-Extrude3 (add)
    with BuildSketch(Plane(origin=(0, 0, -1.625), x_dir=(-1, 0, 0), z_dir=(0, 0, -1))):
        with Locations((77.845, 5.5)):
            Rectangle(SKETCH3_W, SKETCH3_H)
        with Locations((7.395, 5.5)):
            Rectangle(SKETCH3_W, SKETCH3_H)
    extrude(amount=BOSS_EXTRUDE3_DEPTH)

    # Sketch3<2> → Boss-Extrude4 (add)
    with BuildSketch(Plane(origin=(0, 0, -1.625), x_dir=(-1, 0, 0), z_dir=(0, 0, -1)).offset(BOSS_EXTRUDE4_START)):
        with Locations((77.845, 5.5)):
            Rectangle(SKETCH3_2_W, SKETCH3_2_H)
        with Locations((7.395, 5.5)):
            Rectangle(SKETCH3_2_W, SKETCH3_2_H)
    extrude(amount=-BOSS_EXTRUDE4_DEPTH)

    # Fillet1
    fillet1_edges = [part.edges().sort_by_distance(p)[0] for p in [
        (-72.845, 5.5, 47.065),
        (-82.845, 5.5, 47.065),
        (-12.395, 5.5, 47.065),
        (-2.395, 5.5, 47.065),
        (-82.845, 5.5, -11.625),
        (-72.845, 5.5, -11.625),
        (-2.395, 5.5, -11.625),
        (-12.395, 5.5, -11.625),
    ]]
    fillet(fillet1_edges, radius=FILLET1_R)

    # Fillet2
    # the kernel refuses this fillet: 2 mm, written as the material it takes off along each edge
    with BuildSketch(Plane(origin=(-72.845, 4, 37.065), x_dir=(-1, 0, 0), z_dir=(0, 0, 1)), Plane(origin=(-12.395, 4, -1.625), x_dir=(1, 0, 0), z_dir=(0, 0, -1))) as fillet2_piece_1:
        with BuildLine():
            CenterArc((FILLET2_R, -FILLET2_R), FILLET2_R, 90, 90)
            Line((0, -FILLET2_R), (0, 0))
            Line((0, 0), (FILLET2_R, 0))
        make_face()
    extrude(amount=8, mode=Mode.SUBTRACT)
    with BuildSketch(Plane(origin=(-2.395, 4, 32.065), x_dir=(-1, 0, 0), z_dir=(0, 0, 1))) as fillet2_piece_2_section:
        with BuildLine():
            CenterArc((FILLET2_R, -FILLET2_R), FILLET2_R, 90, 90)
            Line((0, -FILLET2_R), (0, 0))
            Line((0, 0), (FILLET2_R, 0))
        make_face()
    fillet2_piece_2 = extrude(amount=13, mode=Mode.PRIVATE)
    fillet2_piece_2 = fillet2_piece_2 - Plane(origin=(-2.395, 4.450962193, 32.565), x_dir=(0.5322222222222478, 0, -0.8466046929782591), z_dir=(0, -1, 0)) * Cylinder(4.5, 34, mode=Mode.PRIVATE)
    add(fillet2_piece_2, mode=Mode.SUBTRACT)
    with BuildSketch(Plane(origin=(-4.395, 4, 47.065), x_dir=(0, 0, -1), z_dir=(-1, 0, 0)), Plane(origin=(-80.845, 4, -11.625), x_dir=(0, 0, 1), z_dir=(1, 0, 0))) as fillet2_piece_3:
        with BuildLine():
            CenterArc((FILLET2_R, -FILLET2_R), FILLET2_R, 90, 90)
            Line((0, -FILLET2_R), (0, 0))
            Line((0, 0), (FILLET2_R, 0))
        make_face()
    extrude(amount=6, mode=Mode.SUBTRACT)
    with BuildSketch(Plane(origin=(-12.395, 4, 37.065), x_dir=(1, 0, 0), z_dir=(0, 0, 1)), Plane(origin=(-72.845, 4, -1.625), x_dir=(-1, 0, 0), z_dir=(0, 0, -1))) as fillet2_piece_4:
        with BuildLine():
            CenterArc((FILLET2_R, FILLET2_R), FILLET2_R, 180, 90)
            Line((0, FILLET2_R), (0, 0))
            Line((0, 0), (FILLET2_R, 0))
        make_face()
    extrude(amount=8, mode=Mode.SUBTRACT)
    with BuildSketch(Plane(origin=(-80.845, 4, 47.065), x_dir=(0, 0, -1), z_dir=(1, 0, 0)), Plane(origin=(-4.395, 4, -11.625), x_dir=(0, 0, 1), z_dir=(-1, 0, 0))) as fillet2_piece_5:
        with BuildLine():
            CenterArc((FILLET2_R, FILLET2_R), FILLET2_R, 180, 90)
            Line((0, FILLET2_R), (0, 0))
            Line((0, 0), (FILLET2_R, 0))
        make_face()
    extrude(amount=6, mode=Mode.SUBTRACT)
    with BuildSketch(Plane(origin=(-82.845, 4, 32.065), x_dir=(1, 0, 0), z_dir=(0, 0, 1))) as fillet2_piece_6_section:
        with BuildLine():
            CenterArc((FILLET2_R, FILLET2_R), FILLET2_R, 180, 90)
            Line((0, FILLET2_R), (0, 0))
            Line((0, 0), (FILLET2_R, 0))
        make_face()
    fillet2_piece_6 = extrude(amount=13, mode=Mode.PRIVATE)
    fillet2_piece_6 = fillet2_piece_6 - Plane(origin=(-82.845, 4.450962196, 32.565), x_dir=(-0.5677777777777745, 0, -0.8231818724083592), z_dir=(0, -1, 0)) * Cylinder(4.5, 34, mode=Mode.PRIVATE)
    add(fillet2_piece_6, mode=Mode.SUBTRACT)
    with BuildSketch(Plane(origin=(-82.845, 4, 3.375), x_dir=(1, 0, 0), z_dir=(0, 0, -1))) as fillet2_piece_7_section:
        with BuildLine():
            CenterArc((FILLET2_R, -FILLET2_R), FILLET2_R, 90, 90)
            Line((0, -FILLET2_R), (0, 0))
            Line((0, 0), (FILLET2_R, 0))
        make_face()
    fillet2_piece_7 = extrude(amount=13, mode=Mode.PRIVATE)
    fillet2_piece_7 = fillet2_piece_7 - Plane(origin=(-82.845, 4.450962193, 2.875), x_dir=(-0.567777777777785, 0, 0.823181872408352), z_dir=(0, -1, 0)) * Cylinder(4.5, 34, mode=Mode.PRIVATE)
    add(fillet2_piece_7, mode=Mode.SUBTRACT)
    with BuildSketch(Plane(origin=(-2.395, 4, 3.375), x_dir=(-1, 0, 0), z_dir=(0, 0, -1))) as fillet2_piece_8_section:
        with BuildLine():
            CenterArc((FILLET2_R, FILLET2_R), FILLET2_R, 180, 90)
            Line((0, FILLET2_R), (0, 0))
            Line((0, 0), (FILLET2_R, 0))
        make_face()
    fillet2_piece_8 = extrude(amount=13, mode=Mode.PRIVATE)
    fillet2_piece_8 = fillet2_piece_8 - Plane(origin=(-2.395, 4.450962196, 2.875), x_dir=(-0.7692990235625408, 0, -0.638888888888922), z_dir=(0, -1, 0)) * Cylinder(4.5, 34, mode=Mode.PRIVATE)
    add(fillet2_piece_8, mode=Mode.SUBTRACT)
    with BuildSketch(Plane(origin=(-80.845, 4, -9.625), x_dir=(0, 0, -1), z_dir=(1, 0, 0))) as fillet2_piece_9:
        with BuildLine():
            CenterArc((2 - FILLET2_R, FILLET2_R), FILLET2_R, 270, 90)
            Line((2, FILLET2_R), (2, 0))
            Line((2, 0), (2 - FILLET2_R, 0))
        make_face()
    revolve(axis=Axis((-80.845, 4, -9.625), (0, 1, 0)), revolution_arc=90, mode=Mode.SUBTRACT)
    with BuildSketch(Plane(origin=(-74.845, 4, -9.625), x_dir=(1, 0, 0), z_dir=(0, 0, 1))) as fillet2_piece_10:
        with BuildLine():
            CenterArc((2 - FILLET2_R, FILLET2_R), FILLET2_R, 270, 90)
            Line((2, FILLET2_R), (2, 0))
            Line((2, 0), (2 - FILLET2_R, 0))
        make_face()
    revolve(axis=Axis((-74.845, 4, -9.625), (0, 1, 0)), revolution_arc=90, mode=Mode.SUBTRACT)
    with BuildSketch(Plane(origin=(-10.395, 4, -9.625), x_dir=(0, 0, -1), z_dir=(1, 0, 0))) as fillet2_piece_11:
        with BuildLine():
            CenterArc((2 - FILLET2_R, FILLET2_R), FILLET2_R, 270, 90)
            Line((2, FILLET2_R), (2, 0))
            Line((2, 0), (2 - FILLET2_R, 0))
        make_face()
    revolve(axis=Axis((-10.395, 4, -9.625), (0, 1, 0)), revolution_arc=90, mode=Mode.SUBTRACT)
    with BuildSketch(Plane(origin=(-4.395, 4, -9.625), x_dir=(1, 0, 0), z_dir=(0, 0, 1))) as fillet2_piece_12:
        with BuildLine():
            CenterArc((2 - FILLET2_R, FILLET2_R), FILLET2_R, 270, 90)
            Line((2, FILLET2_R), (2, 0))
            Line((2, 0), (2 - FILLET2_R, 0))
        make_face()
    revolve(axis=Axis((-4.395, 4, -9.625), (0, 1, 0)), revolution_arc=90, mode=Mode.SUBTRACT)
    with BuildSketch(Plane(origin=(-4.395, 4, 45.065), x_dir=(1, 0, 0), z_dir=(0, 0, -1))) as fillet2_piece_13:
        with BuildLine():
            CenterArc((2 - FILLET2_R, -FILLET2_R), FILLET2_R, 0, 90)
            Line((2, -FILLET2_R), (2, 0))
            Line((2, 0), (2 - FILLET2_R, 0))
        make_face()
    revolve(axis=Axis((-4.395, 4, 45.065), (0, -1, 0)), revolution_arc=90, mode=Mode.SUBTRACT)
    with BuildSketch(Plane(origin=(-10.395, 4, 45.065), x_dir=(-1, 0, 0), z_dir=(0, 0, -1))) as fillet2_piece_14:
        with BuildLine():
            CenterArc((2 - FILLET2_R, FILLET2_R), FILLET2_R, 270, 90)
            Line((2, FILLET2_R), (2, 0))
            Line((2, 0), (2 - FILLET2_R, 0))
        make_face()
    revolve(axis=Axis((-10.395, 4, 45.065), (0, 1, 0)), revolution_arc=90, mode=Mode.SUBTRACT)
    with BuildSketch(Plane(origin=(-80.845, 4, 45.065), x_dir=(-1, 0, 0), z_dir=(0, 0, -1))) as fillet2_piece_15:
        with BuildLine():
            CenterArc((2 - FILLET2_R, FILLET2_R), FILLET2_R, 270, 90)
            Line((2, FILLET2_R), (2, 0))
            Line((2, 0), (2 - FILLET2_R, 0))
        make_face()
    revolve(axis=Axis((-80.845, 4, 45.065), (0, 1, 0)), revolution_arc=90, mode=Mode.SUBTRACT)
    with BuildSketch(Plane(origin=(-74.845, 4, 45.065), x_dir=(1, 0, 0), z_dir=(0, 0, -1))) as fillet2_piece_16:
        with BuildLine():
            CenterArc((2 - FILLET2_R, -FILLET2_R), FILLET2_R, 0, 90)
            Line((2, -FILLET2_R), (2, 0))
            Line((2, 0), (2 - FILLET2_R, 0))
        make_face()
    revolve(axis=Axis((-74.845, 4, 45.065), (0, -1, 0)), revolution_arc=90, mode=Mode.SUBTRACT)

    # Sketch4 → Cut-Extrude2 (cut, up to next)
    with BuildSketch(Plane(origin=(0, 7, 0), x_dir=(1, 0, 0), z_dir=(0, 1, 0)), mode=Mode.PRIVATE) as cut_extrude2_sk1:
        with Locations(Location((-77.845, 6.625, 0), (0, 0, 270))):
            Circle(SKETCH4_R)
    cut_extrude2_tool1 = extrude(cut_extrude2_sk1.sketch, amount=-CUT_EXTRUDE2_REACH, mode=Mode.PRIVATE) & part.part
    # Sketch4 → Cut-Extrude2 (cut, up to next)
    with BuildSketch(Plane(origin=(0, 7, 0), x_dir=(1, 0, 0), z_dir=(0, 1, 0)), mode=Mode.PRIVATE) as cut_extrude2_sk2:
        with Locations(Location((-7.395, 6.625, 0), (0, 0, 270))):
            Circle(SKETCH4_R)
    cut_extrude2_tool2 = extrude(cut_extrude2_sk2.sketch, amount=-CUT_EXTRUDE2_REACH, mode=Mode.PRIVATE) & part.part
    # Sketch4 → Cut-Extrude2 (cut, up to next)
    with BuildSketch(Plane(origin=(0, 7, 0), x_dir=(1, 0, 0), z_dir=(0, 1, 0)), mode=Mode.PRIVATE) as cut_extrude2_sk3:
        with Locations(Location((-7.395, -42.065, 0), (0, 0, 270))):
            Circle(SKETCH4_R)
    cut_extrude2_tool3 = extrude(cut_extrude2_sk3.sketch, amount=-CUT_EXTRUDE2_REACH, mode=Mode.PRIVATE) & part.part
    # Sketch4 → Cut-Extrude2 (cut, up to next)
    with BuildSketch(Plane(origin=(0, 7, 0), x_dir=(1, 0, 0), z_dir=(0, 1, 0)), mode=Mode.PRIVATE) as cut_extrude2_sk4:
        with Locations(Location((-77.845, -42.065, 0), (0, 0, 270))):
            Circle(SKETCH4_R)
    cut_extrude2_tool4 = extrude(cut_extrude2_sk4.sketch, amount=-CUT_EXTRUDE2_REACH, mode=Mode.PRIVATE) & part.part
    add(cut_extrude2_tool1.solids().sort_by_distance((-77.845, 7, -6.625))[0], mode=Mode.SUBTRACT)
    add(cut_extrude2_tool2.solids().sort_by_distance((-7.395, 7, -6.625))[0], mode=Mode.SUBTRACT)
    add(cut_extrude2_tool3.solids().sort_by_distance((-7.395, 7, 42.065))[0], mode=Mode.SUBTRACT)
    add(cut_extrude2_tool4.solids().sort_by_distance((-77.845, 7, 42.065))[0], mode=Mode.SUBTRACT)


solid = part.part
